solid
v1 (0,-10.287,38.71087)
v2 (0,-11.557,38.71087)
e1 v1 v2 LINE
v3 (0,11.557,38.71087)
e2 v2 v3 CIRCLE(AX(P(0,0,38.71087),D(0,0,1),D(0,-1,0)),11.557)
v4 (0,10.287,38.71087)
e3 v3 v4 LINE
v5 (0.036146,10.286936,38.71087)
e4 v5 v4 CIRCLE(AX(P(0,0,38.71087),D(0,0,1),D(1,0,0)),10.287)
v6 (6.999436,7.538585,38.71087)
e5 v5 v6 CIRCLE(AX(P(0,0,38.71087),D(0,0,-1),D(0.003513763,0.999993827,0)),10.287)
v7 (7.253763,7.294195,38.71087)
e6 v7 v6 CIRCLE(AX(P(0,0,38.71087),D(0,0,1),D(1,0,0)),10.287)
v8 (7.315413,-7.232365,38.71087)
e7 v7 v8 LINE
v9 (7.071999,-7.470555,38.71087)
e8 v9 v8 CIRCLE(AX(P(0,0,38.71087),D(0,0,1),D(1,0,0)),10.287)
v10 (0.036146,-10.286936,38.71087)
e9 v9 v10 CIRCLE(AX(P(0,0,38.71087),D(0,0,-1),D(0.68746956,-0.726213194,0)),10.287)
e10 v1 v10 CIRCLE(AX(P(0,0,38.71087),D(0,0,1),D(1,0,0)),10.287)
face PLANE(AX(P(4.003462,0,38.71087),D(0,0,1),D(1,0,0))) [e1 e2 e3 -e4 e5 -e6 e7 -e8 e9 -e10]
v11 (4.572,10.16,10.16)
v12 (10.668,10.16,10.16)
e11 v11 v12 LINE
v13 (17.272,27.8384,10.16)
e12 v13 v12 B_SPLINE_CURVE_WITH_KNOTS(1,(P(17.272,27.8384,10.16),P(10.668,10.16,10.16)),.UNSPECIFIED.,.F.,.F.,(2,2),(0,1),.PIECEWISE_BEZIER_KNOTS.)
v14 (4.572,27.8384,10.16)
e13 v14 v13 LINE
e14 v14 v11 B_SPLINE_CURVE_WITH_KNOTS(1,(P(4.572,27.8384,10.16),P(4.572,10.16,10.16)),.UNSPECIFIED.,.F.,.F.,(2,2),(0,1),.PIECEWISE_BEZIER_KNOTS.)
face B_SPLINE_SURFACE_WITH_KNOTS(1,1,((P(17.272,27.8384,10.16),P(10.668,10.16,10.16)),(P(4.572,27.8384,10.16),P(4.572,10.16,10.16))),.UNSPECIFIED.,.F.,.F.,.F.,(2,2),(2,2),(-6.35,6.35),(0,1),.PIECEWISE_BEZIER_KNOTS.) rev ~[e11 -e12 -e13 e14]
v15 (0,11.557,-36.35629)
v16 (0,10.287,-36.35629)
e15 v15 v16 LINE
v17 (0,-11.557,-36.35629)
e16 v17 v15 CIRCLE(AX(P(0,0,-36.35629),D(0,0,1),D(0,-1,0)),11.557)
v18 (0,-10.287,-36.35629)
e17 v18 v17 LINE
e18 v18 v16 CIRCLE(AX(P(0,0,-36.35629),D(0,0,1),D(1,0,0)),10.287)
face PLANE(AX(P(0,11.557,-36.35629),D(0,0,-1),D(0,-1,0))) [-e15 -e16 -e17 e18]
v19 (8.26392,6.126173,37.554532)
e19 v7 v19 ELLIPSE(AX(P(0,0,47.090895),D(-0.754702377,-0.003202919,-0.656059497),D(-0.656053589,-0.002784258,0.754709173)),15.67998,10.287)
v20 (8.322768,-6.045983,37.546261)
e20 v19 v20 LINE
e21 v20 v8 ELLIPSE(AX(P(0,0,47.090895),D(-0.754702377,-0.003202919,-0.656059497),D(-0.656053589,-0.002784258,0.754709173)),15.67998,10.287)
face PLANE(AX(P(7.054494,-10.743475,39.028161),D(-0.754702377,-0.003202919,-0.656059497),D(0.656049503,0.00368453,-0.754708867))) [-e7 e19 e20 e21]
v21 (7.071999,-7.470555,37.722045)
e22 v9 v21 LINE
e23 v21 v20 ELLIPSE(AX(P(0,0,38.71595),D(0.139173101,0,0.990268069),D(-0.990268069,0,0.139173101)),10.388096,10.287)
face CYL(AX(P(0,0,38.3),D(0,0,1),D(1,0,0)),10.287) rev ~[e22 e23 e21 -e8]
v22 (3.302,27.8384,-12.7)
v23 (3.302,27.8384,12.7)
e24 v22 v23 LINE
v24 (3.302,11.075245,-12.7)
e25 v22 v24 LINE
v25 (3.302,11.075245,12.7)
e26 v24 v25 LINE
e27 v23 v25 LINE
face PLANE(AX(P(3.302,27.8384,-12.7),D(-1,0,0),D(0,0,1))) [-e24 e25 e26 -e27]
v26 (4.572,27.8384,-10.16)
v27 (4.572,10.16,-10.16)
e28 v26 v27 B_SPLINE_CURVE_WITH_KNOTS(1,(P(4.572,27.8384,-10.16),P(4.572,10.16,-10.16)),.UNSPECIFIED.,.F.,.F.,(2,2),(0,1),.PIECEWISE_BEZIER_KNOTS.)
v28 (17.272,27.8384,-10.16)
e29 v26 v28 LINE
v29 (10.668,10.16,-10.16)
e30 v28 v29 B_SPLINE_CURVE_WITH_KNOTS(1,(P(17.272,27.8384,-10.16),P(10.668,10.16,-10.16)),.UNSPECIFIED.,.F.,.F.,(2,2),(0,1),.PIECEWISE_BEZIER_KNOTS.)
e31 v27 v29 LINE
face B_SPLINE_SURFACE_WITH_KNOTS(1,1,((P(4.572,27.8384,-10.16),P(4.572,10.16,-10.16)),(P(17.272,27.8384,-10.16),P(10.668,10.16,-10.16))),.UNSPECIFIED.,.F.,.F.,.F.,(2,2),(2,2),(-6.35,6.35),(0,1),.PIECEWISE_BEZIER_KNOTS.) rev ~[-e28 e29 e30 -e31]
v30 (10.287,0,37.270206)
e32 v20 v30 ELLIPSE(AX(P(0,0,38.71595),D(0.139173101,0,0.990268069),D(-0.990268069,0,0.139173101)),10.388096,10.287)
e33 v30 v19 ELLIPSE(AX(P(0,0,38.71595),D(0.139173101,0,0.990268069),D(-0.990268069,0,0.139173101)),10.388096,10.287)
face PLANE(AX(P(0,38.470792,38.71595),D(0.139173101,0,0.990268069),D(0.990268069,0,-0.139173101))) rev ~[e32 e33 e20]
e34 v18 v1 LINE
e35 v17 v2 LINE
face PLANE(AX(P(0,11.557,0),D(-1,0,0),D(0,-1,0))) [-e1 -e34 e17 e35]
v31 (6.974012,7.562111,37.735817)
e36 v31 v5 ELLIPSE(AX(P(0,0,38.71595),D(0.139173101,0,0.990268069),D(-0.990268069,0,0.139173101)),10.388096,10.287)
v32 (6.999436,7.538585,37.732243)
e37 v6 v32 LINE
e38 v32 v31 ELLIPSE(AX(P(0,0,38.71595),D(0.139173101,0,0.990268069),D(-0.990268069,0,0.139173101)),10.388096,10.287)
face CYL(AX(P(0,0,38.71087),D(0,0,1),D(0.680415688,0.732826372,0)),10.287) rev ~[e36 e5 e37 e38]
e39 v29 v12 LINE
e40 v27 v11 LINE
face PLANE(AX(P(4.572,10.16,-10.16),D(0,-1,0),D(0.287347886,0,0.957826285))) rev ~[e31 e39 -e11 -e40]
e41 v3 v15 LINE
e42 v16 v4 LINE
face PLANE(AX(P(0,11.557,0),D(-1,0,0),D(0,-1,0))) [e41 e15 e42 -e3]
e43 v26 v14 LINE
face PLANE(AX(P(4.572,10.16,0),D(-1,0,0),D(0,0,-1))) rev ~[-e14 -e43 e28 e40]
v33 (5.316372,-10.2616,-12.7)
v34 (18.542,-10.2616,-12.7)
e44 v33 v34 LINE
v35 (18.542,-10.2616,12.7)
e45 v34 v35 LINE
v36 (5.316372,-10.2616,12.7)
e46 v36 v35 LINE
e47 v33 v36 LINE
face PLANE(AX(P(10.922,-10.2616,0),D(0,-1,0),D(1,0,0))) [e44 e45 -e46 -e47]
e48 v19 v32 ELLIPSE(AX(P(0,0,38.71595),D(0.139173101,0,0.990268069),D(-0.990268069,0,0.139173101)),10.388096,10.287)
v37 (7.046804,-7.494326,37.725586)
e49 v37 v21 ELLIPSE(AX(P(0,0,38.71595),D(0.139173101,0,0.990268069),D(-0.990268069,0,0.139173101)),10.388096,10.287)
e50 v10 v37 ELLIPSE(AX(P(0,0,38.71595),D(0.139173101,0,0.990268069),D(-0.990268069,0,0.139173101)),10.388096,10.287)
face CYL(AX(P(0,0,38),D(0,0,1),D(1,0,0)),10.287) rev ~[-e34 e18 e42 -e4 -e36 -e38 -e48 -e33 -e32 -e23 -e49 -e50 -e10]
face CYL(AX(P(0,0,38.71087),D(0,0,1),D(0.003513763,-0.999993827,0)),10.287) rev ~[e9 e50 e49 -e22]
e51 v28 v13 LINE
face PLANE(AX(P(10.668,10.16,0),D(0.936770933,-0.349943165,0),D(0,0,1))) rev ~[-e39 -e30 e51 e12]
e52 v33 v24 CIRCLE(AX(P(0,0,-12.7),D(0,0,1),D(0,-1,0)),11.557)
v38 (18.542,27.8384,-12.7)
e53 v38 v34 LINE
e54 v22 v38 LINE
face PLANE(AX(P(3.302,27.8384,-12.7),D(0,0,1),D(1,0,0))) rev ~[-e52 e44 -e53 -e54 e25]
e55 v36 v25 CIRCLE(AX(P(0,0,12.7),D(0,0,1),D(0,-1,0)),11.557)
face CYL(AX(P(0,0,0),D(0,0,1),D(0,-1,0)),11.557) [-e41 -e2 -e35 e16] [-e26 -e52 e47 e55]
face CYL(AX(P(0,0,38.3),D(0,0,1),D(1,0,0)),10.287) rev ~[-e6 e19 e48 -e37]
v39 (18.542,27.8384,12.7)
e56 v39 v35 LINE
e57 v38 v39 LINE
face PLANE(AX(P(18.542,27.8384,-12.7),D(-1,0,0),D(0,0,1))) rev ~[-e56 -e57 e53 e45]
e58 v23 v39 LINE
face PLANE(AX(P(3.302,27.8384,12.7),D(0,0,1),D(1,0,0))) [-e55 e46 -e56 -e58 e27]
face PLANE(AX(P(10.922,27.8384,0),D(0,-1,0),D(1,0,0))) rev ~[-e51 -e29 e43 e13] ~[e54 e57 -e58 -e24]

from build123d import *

# Parameters (mm, degrees)
F1_DEPTH     = 37.95141
F3_DEPTH     = 0.75946
F4_T4_DEPTH  = 76.9415838332
F4_S5_R      = 10.287
F4_T6_DEPTH  = 40
F5_W         = 23.114
F5_H         = 1.59512
F6_DEPTH     = 25.4
F9_DEPTH     = 25.4
F10_T4_DEPTH = 21.5531370707
F10_S5_R     = 10.287
F10_T6_DEPTH = 12
F14_W        = 15.24
F14_H        = 25.4
F14_W_2      = 12.7
F14_H_2      = 20.32
F15_DEPTH    = 38.1
F12_W        = 6.096
F12_H        = 20.32
F17_DEPTH    = 25.4


# Not quite as in the source:
# - a fillet or chamfer that OpenCascade refuses, or shapes differently, is made with other operations: its cross-section is extruded or revolved along the edge and cut away or added


with BuildPart() as f1:
    # F0 (on Top) → F1 (new body, symmetric)
    with BuildSketch(Plane.XY):
        with BuildLine():
            ThreePointArc((0, 10.287), (10.287, 0), (0, -10.287))
            Line((0, -10.287), (0, -11.557))
            ThreePointArc((0, -11.557), (11.557, 0), (0, 11.557))
            Line((0, 11.557), (0, 10.287))
        make_face()
    extrude(amount=F1_DEPTH, both=True)

    # F2 (on face) → F3 (join, symmetric)
    with BuildSketch(Plane.XY.offset(37.95141)):
        with BuildLine():
            Line((0, 11.557), (0, -11.557))
            ThreePointArc((0, -11.557), (11.557, 0), (0, 11.557))
        make_face()
    extrude(amount=F3_DEPTH, both=True)

    # F4: chamfer of 1.524 x 10.8438234569 on 1 edges, made by hand


with BuildPart() as f4_tool2:
    # F4_s3 → F4_t4 (new body)
    with BuildSketch(Plane.XZ.offset(-38.4707919166)):
        Polygon((0, 38.71595), (10.8438234569, 37.19195), (0, 37.19195), align=None)
    extrude(amount=F4_T4_DEPTH)

    # F4_s5 → F4_t6 (intersect, symmetric)
    with BuildSketch(Plane.XY.offset(38)):
        Circle(F4_S5_R)
    extrude(amount=F4_T6_DEPTH, both=True, mode=Mode.INTERSECT)


with BuildPart() as f1_1:
    add(f1.part)

    # F4_t1: cut F4_tool2
    add(f4_tool2.part, mode=Mode.SUBTRACT)

    # F5 (on face) → F6 (cut)
    with BuildSketch(Plane(origin=(0, 0, 0), x_dir=(0, -1, 0), z_dir=(-1, 0, 0))):
        with Locations((0, -37.15385)):
            Rectangle(F5_W, F5_H)
    extrude(amount=-F6_DEPTH, mode=Mode.SUBTRACT)

    # F8 (on face) → F9 (cut)
    with BuildSketch(Plane.XY.offset(38.71087)):
        with BuildLine():
            Line((7.0719993682, -7.4705551291), (6.9994361845, 7.5385848871))
            ThreePointArc((6.9994361845, 7.5385848871), (3.7766669941, 9.5686548384), (0.0361460782, 10.2869364954))
            Line((0.0361460782, 10.2869364954), (0.0361460782, -10.2869364954))
            ThreePointArc((0.0361460782, -10.2869364954), (3.8228829333, -9.5502845548), (7.0719993682, -7.4705551291))
        make_face()
    extrude(amount=-F9_DEPTH, mode=Mode.SUBTRACT)

    # F10: chamfer of 1.27 on 1 edges, made by hand


with BuildPart() as f10_tool2:
    # F10_s3 → F10_t4 (new body)
    with BuildSketch(Plane(origin=(0.0519758467, -10.7508066832, -0.0073047289), x_dir=(-0.9999883135, -0.0048345432, 0), z_dir=(-0.0048345421, 0.9999880827, 0.0006794506))):
        with BuildLine():
            Line((-7.0024721698, 39.0354748619), (-8.3267685678, 37.5120486506))
            Line((-8.3267685678, 37.5120486506), (-8.3232336123, 37.4868958359))
            ThreePointArc((-8.3232336123, 37.4868958359), (-7.6800684701, 37.6109410786), (-7.0322650445, 37.7019828278))
            Line((-7.0322650445, 37.7019828278), (-7.0104, 37.7271356426))
            ThreePointArc((-7.0104, 37.7271356426), (-7.0104, 38.3813052522), (-6.9770721698, 39.0354748619))
            Line((-6.9770721698, 39.0354748619), (-7.0024721698, 39.0354748619))
        make_face()
    extrude(amount=F10_T4_DEPTH)

    # F10_s5 → F10_t6 (intersect, symmetric)
    with BuildSketch(Plane.XY.offset(38.3)):
        Circle(F10_S5_R)
    extrude(amount=F10_T6_DEPTH, both=True, mode=Mode.INTERSECT)


with BuildPart() as f1_2:
    add(f1_1.part)

    # F10_t1: cut F10_tool2
    add(f10_tool2.part, mode=Mode.SUBTRACT)

    # F14 (on offset) → F15 (join)
    with BuildSketch(Plane.XZ.offset(-27.8384)):
        with Locations((10.922, 0)):
            Rectangle(F14_W, F14_H)
        with Locations((10.922, 0)):
            Rectangle(F14_W_2, F14_H_2, mode=Mode.SUBTRACT)
        with Locations((10.922, 0)):
            Rectangle(F14_W_2, F14_H_2)
    extrude(amount=F15_DEPTH)

    # F14 (on offset) → F16 section 0
    with BuildSketch(Plane.XZ.offset(-27.8384)):
        with Locations((10.922, 0)):
            Rectangle(F14_W_2, F14_H_2)
    # F12 (on offset) → F16 section 1
    with BuildSketch(Plane.XZ.offset(-10.16)):
        with Locations((7.62, 0)):
            Rectangle(F12_W, F12_H)
    loft(mode=Mode.SUBTRACT)

    # F17 (cut): a face of the model
    f17_faces = [f1_2.faces().sort_by_distance(p)[0] for p in [
        (6.1976073011, 0, -12.7),
    ]]
    extrude(f17_faces, amount=-F17_DEPTH, mode=Mode.SUBTRACT)


solid = f1_2.part
